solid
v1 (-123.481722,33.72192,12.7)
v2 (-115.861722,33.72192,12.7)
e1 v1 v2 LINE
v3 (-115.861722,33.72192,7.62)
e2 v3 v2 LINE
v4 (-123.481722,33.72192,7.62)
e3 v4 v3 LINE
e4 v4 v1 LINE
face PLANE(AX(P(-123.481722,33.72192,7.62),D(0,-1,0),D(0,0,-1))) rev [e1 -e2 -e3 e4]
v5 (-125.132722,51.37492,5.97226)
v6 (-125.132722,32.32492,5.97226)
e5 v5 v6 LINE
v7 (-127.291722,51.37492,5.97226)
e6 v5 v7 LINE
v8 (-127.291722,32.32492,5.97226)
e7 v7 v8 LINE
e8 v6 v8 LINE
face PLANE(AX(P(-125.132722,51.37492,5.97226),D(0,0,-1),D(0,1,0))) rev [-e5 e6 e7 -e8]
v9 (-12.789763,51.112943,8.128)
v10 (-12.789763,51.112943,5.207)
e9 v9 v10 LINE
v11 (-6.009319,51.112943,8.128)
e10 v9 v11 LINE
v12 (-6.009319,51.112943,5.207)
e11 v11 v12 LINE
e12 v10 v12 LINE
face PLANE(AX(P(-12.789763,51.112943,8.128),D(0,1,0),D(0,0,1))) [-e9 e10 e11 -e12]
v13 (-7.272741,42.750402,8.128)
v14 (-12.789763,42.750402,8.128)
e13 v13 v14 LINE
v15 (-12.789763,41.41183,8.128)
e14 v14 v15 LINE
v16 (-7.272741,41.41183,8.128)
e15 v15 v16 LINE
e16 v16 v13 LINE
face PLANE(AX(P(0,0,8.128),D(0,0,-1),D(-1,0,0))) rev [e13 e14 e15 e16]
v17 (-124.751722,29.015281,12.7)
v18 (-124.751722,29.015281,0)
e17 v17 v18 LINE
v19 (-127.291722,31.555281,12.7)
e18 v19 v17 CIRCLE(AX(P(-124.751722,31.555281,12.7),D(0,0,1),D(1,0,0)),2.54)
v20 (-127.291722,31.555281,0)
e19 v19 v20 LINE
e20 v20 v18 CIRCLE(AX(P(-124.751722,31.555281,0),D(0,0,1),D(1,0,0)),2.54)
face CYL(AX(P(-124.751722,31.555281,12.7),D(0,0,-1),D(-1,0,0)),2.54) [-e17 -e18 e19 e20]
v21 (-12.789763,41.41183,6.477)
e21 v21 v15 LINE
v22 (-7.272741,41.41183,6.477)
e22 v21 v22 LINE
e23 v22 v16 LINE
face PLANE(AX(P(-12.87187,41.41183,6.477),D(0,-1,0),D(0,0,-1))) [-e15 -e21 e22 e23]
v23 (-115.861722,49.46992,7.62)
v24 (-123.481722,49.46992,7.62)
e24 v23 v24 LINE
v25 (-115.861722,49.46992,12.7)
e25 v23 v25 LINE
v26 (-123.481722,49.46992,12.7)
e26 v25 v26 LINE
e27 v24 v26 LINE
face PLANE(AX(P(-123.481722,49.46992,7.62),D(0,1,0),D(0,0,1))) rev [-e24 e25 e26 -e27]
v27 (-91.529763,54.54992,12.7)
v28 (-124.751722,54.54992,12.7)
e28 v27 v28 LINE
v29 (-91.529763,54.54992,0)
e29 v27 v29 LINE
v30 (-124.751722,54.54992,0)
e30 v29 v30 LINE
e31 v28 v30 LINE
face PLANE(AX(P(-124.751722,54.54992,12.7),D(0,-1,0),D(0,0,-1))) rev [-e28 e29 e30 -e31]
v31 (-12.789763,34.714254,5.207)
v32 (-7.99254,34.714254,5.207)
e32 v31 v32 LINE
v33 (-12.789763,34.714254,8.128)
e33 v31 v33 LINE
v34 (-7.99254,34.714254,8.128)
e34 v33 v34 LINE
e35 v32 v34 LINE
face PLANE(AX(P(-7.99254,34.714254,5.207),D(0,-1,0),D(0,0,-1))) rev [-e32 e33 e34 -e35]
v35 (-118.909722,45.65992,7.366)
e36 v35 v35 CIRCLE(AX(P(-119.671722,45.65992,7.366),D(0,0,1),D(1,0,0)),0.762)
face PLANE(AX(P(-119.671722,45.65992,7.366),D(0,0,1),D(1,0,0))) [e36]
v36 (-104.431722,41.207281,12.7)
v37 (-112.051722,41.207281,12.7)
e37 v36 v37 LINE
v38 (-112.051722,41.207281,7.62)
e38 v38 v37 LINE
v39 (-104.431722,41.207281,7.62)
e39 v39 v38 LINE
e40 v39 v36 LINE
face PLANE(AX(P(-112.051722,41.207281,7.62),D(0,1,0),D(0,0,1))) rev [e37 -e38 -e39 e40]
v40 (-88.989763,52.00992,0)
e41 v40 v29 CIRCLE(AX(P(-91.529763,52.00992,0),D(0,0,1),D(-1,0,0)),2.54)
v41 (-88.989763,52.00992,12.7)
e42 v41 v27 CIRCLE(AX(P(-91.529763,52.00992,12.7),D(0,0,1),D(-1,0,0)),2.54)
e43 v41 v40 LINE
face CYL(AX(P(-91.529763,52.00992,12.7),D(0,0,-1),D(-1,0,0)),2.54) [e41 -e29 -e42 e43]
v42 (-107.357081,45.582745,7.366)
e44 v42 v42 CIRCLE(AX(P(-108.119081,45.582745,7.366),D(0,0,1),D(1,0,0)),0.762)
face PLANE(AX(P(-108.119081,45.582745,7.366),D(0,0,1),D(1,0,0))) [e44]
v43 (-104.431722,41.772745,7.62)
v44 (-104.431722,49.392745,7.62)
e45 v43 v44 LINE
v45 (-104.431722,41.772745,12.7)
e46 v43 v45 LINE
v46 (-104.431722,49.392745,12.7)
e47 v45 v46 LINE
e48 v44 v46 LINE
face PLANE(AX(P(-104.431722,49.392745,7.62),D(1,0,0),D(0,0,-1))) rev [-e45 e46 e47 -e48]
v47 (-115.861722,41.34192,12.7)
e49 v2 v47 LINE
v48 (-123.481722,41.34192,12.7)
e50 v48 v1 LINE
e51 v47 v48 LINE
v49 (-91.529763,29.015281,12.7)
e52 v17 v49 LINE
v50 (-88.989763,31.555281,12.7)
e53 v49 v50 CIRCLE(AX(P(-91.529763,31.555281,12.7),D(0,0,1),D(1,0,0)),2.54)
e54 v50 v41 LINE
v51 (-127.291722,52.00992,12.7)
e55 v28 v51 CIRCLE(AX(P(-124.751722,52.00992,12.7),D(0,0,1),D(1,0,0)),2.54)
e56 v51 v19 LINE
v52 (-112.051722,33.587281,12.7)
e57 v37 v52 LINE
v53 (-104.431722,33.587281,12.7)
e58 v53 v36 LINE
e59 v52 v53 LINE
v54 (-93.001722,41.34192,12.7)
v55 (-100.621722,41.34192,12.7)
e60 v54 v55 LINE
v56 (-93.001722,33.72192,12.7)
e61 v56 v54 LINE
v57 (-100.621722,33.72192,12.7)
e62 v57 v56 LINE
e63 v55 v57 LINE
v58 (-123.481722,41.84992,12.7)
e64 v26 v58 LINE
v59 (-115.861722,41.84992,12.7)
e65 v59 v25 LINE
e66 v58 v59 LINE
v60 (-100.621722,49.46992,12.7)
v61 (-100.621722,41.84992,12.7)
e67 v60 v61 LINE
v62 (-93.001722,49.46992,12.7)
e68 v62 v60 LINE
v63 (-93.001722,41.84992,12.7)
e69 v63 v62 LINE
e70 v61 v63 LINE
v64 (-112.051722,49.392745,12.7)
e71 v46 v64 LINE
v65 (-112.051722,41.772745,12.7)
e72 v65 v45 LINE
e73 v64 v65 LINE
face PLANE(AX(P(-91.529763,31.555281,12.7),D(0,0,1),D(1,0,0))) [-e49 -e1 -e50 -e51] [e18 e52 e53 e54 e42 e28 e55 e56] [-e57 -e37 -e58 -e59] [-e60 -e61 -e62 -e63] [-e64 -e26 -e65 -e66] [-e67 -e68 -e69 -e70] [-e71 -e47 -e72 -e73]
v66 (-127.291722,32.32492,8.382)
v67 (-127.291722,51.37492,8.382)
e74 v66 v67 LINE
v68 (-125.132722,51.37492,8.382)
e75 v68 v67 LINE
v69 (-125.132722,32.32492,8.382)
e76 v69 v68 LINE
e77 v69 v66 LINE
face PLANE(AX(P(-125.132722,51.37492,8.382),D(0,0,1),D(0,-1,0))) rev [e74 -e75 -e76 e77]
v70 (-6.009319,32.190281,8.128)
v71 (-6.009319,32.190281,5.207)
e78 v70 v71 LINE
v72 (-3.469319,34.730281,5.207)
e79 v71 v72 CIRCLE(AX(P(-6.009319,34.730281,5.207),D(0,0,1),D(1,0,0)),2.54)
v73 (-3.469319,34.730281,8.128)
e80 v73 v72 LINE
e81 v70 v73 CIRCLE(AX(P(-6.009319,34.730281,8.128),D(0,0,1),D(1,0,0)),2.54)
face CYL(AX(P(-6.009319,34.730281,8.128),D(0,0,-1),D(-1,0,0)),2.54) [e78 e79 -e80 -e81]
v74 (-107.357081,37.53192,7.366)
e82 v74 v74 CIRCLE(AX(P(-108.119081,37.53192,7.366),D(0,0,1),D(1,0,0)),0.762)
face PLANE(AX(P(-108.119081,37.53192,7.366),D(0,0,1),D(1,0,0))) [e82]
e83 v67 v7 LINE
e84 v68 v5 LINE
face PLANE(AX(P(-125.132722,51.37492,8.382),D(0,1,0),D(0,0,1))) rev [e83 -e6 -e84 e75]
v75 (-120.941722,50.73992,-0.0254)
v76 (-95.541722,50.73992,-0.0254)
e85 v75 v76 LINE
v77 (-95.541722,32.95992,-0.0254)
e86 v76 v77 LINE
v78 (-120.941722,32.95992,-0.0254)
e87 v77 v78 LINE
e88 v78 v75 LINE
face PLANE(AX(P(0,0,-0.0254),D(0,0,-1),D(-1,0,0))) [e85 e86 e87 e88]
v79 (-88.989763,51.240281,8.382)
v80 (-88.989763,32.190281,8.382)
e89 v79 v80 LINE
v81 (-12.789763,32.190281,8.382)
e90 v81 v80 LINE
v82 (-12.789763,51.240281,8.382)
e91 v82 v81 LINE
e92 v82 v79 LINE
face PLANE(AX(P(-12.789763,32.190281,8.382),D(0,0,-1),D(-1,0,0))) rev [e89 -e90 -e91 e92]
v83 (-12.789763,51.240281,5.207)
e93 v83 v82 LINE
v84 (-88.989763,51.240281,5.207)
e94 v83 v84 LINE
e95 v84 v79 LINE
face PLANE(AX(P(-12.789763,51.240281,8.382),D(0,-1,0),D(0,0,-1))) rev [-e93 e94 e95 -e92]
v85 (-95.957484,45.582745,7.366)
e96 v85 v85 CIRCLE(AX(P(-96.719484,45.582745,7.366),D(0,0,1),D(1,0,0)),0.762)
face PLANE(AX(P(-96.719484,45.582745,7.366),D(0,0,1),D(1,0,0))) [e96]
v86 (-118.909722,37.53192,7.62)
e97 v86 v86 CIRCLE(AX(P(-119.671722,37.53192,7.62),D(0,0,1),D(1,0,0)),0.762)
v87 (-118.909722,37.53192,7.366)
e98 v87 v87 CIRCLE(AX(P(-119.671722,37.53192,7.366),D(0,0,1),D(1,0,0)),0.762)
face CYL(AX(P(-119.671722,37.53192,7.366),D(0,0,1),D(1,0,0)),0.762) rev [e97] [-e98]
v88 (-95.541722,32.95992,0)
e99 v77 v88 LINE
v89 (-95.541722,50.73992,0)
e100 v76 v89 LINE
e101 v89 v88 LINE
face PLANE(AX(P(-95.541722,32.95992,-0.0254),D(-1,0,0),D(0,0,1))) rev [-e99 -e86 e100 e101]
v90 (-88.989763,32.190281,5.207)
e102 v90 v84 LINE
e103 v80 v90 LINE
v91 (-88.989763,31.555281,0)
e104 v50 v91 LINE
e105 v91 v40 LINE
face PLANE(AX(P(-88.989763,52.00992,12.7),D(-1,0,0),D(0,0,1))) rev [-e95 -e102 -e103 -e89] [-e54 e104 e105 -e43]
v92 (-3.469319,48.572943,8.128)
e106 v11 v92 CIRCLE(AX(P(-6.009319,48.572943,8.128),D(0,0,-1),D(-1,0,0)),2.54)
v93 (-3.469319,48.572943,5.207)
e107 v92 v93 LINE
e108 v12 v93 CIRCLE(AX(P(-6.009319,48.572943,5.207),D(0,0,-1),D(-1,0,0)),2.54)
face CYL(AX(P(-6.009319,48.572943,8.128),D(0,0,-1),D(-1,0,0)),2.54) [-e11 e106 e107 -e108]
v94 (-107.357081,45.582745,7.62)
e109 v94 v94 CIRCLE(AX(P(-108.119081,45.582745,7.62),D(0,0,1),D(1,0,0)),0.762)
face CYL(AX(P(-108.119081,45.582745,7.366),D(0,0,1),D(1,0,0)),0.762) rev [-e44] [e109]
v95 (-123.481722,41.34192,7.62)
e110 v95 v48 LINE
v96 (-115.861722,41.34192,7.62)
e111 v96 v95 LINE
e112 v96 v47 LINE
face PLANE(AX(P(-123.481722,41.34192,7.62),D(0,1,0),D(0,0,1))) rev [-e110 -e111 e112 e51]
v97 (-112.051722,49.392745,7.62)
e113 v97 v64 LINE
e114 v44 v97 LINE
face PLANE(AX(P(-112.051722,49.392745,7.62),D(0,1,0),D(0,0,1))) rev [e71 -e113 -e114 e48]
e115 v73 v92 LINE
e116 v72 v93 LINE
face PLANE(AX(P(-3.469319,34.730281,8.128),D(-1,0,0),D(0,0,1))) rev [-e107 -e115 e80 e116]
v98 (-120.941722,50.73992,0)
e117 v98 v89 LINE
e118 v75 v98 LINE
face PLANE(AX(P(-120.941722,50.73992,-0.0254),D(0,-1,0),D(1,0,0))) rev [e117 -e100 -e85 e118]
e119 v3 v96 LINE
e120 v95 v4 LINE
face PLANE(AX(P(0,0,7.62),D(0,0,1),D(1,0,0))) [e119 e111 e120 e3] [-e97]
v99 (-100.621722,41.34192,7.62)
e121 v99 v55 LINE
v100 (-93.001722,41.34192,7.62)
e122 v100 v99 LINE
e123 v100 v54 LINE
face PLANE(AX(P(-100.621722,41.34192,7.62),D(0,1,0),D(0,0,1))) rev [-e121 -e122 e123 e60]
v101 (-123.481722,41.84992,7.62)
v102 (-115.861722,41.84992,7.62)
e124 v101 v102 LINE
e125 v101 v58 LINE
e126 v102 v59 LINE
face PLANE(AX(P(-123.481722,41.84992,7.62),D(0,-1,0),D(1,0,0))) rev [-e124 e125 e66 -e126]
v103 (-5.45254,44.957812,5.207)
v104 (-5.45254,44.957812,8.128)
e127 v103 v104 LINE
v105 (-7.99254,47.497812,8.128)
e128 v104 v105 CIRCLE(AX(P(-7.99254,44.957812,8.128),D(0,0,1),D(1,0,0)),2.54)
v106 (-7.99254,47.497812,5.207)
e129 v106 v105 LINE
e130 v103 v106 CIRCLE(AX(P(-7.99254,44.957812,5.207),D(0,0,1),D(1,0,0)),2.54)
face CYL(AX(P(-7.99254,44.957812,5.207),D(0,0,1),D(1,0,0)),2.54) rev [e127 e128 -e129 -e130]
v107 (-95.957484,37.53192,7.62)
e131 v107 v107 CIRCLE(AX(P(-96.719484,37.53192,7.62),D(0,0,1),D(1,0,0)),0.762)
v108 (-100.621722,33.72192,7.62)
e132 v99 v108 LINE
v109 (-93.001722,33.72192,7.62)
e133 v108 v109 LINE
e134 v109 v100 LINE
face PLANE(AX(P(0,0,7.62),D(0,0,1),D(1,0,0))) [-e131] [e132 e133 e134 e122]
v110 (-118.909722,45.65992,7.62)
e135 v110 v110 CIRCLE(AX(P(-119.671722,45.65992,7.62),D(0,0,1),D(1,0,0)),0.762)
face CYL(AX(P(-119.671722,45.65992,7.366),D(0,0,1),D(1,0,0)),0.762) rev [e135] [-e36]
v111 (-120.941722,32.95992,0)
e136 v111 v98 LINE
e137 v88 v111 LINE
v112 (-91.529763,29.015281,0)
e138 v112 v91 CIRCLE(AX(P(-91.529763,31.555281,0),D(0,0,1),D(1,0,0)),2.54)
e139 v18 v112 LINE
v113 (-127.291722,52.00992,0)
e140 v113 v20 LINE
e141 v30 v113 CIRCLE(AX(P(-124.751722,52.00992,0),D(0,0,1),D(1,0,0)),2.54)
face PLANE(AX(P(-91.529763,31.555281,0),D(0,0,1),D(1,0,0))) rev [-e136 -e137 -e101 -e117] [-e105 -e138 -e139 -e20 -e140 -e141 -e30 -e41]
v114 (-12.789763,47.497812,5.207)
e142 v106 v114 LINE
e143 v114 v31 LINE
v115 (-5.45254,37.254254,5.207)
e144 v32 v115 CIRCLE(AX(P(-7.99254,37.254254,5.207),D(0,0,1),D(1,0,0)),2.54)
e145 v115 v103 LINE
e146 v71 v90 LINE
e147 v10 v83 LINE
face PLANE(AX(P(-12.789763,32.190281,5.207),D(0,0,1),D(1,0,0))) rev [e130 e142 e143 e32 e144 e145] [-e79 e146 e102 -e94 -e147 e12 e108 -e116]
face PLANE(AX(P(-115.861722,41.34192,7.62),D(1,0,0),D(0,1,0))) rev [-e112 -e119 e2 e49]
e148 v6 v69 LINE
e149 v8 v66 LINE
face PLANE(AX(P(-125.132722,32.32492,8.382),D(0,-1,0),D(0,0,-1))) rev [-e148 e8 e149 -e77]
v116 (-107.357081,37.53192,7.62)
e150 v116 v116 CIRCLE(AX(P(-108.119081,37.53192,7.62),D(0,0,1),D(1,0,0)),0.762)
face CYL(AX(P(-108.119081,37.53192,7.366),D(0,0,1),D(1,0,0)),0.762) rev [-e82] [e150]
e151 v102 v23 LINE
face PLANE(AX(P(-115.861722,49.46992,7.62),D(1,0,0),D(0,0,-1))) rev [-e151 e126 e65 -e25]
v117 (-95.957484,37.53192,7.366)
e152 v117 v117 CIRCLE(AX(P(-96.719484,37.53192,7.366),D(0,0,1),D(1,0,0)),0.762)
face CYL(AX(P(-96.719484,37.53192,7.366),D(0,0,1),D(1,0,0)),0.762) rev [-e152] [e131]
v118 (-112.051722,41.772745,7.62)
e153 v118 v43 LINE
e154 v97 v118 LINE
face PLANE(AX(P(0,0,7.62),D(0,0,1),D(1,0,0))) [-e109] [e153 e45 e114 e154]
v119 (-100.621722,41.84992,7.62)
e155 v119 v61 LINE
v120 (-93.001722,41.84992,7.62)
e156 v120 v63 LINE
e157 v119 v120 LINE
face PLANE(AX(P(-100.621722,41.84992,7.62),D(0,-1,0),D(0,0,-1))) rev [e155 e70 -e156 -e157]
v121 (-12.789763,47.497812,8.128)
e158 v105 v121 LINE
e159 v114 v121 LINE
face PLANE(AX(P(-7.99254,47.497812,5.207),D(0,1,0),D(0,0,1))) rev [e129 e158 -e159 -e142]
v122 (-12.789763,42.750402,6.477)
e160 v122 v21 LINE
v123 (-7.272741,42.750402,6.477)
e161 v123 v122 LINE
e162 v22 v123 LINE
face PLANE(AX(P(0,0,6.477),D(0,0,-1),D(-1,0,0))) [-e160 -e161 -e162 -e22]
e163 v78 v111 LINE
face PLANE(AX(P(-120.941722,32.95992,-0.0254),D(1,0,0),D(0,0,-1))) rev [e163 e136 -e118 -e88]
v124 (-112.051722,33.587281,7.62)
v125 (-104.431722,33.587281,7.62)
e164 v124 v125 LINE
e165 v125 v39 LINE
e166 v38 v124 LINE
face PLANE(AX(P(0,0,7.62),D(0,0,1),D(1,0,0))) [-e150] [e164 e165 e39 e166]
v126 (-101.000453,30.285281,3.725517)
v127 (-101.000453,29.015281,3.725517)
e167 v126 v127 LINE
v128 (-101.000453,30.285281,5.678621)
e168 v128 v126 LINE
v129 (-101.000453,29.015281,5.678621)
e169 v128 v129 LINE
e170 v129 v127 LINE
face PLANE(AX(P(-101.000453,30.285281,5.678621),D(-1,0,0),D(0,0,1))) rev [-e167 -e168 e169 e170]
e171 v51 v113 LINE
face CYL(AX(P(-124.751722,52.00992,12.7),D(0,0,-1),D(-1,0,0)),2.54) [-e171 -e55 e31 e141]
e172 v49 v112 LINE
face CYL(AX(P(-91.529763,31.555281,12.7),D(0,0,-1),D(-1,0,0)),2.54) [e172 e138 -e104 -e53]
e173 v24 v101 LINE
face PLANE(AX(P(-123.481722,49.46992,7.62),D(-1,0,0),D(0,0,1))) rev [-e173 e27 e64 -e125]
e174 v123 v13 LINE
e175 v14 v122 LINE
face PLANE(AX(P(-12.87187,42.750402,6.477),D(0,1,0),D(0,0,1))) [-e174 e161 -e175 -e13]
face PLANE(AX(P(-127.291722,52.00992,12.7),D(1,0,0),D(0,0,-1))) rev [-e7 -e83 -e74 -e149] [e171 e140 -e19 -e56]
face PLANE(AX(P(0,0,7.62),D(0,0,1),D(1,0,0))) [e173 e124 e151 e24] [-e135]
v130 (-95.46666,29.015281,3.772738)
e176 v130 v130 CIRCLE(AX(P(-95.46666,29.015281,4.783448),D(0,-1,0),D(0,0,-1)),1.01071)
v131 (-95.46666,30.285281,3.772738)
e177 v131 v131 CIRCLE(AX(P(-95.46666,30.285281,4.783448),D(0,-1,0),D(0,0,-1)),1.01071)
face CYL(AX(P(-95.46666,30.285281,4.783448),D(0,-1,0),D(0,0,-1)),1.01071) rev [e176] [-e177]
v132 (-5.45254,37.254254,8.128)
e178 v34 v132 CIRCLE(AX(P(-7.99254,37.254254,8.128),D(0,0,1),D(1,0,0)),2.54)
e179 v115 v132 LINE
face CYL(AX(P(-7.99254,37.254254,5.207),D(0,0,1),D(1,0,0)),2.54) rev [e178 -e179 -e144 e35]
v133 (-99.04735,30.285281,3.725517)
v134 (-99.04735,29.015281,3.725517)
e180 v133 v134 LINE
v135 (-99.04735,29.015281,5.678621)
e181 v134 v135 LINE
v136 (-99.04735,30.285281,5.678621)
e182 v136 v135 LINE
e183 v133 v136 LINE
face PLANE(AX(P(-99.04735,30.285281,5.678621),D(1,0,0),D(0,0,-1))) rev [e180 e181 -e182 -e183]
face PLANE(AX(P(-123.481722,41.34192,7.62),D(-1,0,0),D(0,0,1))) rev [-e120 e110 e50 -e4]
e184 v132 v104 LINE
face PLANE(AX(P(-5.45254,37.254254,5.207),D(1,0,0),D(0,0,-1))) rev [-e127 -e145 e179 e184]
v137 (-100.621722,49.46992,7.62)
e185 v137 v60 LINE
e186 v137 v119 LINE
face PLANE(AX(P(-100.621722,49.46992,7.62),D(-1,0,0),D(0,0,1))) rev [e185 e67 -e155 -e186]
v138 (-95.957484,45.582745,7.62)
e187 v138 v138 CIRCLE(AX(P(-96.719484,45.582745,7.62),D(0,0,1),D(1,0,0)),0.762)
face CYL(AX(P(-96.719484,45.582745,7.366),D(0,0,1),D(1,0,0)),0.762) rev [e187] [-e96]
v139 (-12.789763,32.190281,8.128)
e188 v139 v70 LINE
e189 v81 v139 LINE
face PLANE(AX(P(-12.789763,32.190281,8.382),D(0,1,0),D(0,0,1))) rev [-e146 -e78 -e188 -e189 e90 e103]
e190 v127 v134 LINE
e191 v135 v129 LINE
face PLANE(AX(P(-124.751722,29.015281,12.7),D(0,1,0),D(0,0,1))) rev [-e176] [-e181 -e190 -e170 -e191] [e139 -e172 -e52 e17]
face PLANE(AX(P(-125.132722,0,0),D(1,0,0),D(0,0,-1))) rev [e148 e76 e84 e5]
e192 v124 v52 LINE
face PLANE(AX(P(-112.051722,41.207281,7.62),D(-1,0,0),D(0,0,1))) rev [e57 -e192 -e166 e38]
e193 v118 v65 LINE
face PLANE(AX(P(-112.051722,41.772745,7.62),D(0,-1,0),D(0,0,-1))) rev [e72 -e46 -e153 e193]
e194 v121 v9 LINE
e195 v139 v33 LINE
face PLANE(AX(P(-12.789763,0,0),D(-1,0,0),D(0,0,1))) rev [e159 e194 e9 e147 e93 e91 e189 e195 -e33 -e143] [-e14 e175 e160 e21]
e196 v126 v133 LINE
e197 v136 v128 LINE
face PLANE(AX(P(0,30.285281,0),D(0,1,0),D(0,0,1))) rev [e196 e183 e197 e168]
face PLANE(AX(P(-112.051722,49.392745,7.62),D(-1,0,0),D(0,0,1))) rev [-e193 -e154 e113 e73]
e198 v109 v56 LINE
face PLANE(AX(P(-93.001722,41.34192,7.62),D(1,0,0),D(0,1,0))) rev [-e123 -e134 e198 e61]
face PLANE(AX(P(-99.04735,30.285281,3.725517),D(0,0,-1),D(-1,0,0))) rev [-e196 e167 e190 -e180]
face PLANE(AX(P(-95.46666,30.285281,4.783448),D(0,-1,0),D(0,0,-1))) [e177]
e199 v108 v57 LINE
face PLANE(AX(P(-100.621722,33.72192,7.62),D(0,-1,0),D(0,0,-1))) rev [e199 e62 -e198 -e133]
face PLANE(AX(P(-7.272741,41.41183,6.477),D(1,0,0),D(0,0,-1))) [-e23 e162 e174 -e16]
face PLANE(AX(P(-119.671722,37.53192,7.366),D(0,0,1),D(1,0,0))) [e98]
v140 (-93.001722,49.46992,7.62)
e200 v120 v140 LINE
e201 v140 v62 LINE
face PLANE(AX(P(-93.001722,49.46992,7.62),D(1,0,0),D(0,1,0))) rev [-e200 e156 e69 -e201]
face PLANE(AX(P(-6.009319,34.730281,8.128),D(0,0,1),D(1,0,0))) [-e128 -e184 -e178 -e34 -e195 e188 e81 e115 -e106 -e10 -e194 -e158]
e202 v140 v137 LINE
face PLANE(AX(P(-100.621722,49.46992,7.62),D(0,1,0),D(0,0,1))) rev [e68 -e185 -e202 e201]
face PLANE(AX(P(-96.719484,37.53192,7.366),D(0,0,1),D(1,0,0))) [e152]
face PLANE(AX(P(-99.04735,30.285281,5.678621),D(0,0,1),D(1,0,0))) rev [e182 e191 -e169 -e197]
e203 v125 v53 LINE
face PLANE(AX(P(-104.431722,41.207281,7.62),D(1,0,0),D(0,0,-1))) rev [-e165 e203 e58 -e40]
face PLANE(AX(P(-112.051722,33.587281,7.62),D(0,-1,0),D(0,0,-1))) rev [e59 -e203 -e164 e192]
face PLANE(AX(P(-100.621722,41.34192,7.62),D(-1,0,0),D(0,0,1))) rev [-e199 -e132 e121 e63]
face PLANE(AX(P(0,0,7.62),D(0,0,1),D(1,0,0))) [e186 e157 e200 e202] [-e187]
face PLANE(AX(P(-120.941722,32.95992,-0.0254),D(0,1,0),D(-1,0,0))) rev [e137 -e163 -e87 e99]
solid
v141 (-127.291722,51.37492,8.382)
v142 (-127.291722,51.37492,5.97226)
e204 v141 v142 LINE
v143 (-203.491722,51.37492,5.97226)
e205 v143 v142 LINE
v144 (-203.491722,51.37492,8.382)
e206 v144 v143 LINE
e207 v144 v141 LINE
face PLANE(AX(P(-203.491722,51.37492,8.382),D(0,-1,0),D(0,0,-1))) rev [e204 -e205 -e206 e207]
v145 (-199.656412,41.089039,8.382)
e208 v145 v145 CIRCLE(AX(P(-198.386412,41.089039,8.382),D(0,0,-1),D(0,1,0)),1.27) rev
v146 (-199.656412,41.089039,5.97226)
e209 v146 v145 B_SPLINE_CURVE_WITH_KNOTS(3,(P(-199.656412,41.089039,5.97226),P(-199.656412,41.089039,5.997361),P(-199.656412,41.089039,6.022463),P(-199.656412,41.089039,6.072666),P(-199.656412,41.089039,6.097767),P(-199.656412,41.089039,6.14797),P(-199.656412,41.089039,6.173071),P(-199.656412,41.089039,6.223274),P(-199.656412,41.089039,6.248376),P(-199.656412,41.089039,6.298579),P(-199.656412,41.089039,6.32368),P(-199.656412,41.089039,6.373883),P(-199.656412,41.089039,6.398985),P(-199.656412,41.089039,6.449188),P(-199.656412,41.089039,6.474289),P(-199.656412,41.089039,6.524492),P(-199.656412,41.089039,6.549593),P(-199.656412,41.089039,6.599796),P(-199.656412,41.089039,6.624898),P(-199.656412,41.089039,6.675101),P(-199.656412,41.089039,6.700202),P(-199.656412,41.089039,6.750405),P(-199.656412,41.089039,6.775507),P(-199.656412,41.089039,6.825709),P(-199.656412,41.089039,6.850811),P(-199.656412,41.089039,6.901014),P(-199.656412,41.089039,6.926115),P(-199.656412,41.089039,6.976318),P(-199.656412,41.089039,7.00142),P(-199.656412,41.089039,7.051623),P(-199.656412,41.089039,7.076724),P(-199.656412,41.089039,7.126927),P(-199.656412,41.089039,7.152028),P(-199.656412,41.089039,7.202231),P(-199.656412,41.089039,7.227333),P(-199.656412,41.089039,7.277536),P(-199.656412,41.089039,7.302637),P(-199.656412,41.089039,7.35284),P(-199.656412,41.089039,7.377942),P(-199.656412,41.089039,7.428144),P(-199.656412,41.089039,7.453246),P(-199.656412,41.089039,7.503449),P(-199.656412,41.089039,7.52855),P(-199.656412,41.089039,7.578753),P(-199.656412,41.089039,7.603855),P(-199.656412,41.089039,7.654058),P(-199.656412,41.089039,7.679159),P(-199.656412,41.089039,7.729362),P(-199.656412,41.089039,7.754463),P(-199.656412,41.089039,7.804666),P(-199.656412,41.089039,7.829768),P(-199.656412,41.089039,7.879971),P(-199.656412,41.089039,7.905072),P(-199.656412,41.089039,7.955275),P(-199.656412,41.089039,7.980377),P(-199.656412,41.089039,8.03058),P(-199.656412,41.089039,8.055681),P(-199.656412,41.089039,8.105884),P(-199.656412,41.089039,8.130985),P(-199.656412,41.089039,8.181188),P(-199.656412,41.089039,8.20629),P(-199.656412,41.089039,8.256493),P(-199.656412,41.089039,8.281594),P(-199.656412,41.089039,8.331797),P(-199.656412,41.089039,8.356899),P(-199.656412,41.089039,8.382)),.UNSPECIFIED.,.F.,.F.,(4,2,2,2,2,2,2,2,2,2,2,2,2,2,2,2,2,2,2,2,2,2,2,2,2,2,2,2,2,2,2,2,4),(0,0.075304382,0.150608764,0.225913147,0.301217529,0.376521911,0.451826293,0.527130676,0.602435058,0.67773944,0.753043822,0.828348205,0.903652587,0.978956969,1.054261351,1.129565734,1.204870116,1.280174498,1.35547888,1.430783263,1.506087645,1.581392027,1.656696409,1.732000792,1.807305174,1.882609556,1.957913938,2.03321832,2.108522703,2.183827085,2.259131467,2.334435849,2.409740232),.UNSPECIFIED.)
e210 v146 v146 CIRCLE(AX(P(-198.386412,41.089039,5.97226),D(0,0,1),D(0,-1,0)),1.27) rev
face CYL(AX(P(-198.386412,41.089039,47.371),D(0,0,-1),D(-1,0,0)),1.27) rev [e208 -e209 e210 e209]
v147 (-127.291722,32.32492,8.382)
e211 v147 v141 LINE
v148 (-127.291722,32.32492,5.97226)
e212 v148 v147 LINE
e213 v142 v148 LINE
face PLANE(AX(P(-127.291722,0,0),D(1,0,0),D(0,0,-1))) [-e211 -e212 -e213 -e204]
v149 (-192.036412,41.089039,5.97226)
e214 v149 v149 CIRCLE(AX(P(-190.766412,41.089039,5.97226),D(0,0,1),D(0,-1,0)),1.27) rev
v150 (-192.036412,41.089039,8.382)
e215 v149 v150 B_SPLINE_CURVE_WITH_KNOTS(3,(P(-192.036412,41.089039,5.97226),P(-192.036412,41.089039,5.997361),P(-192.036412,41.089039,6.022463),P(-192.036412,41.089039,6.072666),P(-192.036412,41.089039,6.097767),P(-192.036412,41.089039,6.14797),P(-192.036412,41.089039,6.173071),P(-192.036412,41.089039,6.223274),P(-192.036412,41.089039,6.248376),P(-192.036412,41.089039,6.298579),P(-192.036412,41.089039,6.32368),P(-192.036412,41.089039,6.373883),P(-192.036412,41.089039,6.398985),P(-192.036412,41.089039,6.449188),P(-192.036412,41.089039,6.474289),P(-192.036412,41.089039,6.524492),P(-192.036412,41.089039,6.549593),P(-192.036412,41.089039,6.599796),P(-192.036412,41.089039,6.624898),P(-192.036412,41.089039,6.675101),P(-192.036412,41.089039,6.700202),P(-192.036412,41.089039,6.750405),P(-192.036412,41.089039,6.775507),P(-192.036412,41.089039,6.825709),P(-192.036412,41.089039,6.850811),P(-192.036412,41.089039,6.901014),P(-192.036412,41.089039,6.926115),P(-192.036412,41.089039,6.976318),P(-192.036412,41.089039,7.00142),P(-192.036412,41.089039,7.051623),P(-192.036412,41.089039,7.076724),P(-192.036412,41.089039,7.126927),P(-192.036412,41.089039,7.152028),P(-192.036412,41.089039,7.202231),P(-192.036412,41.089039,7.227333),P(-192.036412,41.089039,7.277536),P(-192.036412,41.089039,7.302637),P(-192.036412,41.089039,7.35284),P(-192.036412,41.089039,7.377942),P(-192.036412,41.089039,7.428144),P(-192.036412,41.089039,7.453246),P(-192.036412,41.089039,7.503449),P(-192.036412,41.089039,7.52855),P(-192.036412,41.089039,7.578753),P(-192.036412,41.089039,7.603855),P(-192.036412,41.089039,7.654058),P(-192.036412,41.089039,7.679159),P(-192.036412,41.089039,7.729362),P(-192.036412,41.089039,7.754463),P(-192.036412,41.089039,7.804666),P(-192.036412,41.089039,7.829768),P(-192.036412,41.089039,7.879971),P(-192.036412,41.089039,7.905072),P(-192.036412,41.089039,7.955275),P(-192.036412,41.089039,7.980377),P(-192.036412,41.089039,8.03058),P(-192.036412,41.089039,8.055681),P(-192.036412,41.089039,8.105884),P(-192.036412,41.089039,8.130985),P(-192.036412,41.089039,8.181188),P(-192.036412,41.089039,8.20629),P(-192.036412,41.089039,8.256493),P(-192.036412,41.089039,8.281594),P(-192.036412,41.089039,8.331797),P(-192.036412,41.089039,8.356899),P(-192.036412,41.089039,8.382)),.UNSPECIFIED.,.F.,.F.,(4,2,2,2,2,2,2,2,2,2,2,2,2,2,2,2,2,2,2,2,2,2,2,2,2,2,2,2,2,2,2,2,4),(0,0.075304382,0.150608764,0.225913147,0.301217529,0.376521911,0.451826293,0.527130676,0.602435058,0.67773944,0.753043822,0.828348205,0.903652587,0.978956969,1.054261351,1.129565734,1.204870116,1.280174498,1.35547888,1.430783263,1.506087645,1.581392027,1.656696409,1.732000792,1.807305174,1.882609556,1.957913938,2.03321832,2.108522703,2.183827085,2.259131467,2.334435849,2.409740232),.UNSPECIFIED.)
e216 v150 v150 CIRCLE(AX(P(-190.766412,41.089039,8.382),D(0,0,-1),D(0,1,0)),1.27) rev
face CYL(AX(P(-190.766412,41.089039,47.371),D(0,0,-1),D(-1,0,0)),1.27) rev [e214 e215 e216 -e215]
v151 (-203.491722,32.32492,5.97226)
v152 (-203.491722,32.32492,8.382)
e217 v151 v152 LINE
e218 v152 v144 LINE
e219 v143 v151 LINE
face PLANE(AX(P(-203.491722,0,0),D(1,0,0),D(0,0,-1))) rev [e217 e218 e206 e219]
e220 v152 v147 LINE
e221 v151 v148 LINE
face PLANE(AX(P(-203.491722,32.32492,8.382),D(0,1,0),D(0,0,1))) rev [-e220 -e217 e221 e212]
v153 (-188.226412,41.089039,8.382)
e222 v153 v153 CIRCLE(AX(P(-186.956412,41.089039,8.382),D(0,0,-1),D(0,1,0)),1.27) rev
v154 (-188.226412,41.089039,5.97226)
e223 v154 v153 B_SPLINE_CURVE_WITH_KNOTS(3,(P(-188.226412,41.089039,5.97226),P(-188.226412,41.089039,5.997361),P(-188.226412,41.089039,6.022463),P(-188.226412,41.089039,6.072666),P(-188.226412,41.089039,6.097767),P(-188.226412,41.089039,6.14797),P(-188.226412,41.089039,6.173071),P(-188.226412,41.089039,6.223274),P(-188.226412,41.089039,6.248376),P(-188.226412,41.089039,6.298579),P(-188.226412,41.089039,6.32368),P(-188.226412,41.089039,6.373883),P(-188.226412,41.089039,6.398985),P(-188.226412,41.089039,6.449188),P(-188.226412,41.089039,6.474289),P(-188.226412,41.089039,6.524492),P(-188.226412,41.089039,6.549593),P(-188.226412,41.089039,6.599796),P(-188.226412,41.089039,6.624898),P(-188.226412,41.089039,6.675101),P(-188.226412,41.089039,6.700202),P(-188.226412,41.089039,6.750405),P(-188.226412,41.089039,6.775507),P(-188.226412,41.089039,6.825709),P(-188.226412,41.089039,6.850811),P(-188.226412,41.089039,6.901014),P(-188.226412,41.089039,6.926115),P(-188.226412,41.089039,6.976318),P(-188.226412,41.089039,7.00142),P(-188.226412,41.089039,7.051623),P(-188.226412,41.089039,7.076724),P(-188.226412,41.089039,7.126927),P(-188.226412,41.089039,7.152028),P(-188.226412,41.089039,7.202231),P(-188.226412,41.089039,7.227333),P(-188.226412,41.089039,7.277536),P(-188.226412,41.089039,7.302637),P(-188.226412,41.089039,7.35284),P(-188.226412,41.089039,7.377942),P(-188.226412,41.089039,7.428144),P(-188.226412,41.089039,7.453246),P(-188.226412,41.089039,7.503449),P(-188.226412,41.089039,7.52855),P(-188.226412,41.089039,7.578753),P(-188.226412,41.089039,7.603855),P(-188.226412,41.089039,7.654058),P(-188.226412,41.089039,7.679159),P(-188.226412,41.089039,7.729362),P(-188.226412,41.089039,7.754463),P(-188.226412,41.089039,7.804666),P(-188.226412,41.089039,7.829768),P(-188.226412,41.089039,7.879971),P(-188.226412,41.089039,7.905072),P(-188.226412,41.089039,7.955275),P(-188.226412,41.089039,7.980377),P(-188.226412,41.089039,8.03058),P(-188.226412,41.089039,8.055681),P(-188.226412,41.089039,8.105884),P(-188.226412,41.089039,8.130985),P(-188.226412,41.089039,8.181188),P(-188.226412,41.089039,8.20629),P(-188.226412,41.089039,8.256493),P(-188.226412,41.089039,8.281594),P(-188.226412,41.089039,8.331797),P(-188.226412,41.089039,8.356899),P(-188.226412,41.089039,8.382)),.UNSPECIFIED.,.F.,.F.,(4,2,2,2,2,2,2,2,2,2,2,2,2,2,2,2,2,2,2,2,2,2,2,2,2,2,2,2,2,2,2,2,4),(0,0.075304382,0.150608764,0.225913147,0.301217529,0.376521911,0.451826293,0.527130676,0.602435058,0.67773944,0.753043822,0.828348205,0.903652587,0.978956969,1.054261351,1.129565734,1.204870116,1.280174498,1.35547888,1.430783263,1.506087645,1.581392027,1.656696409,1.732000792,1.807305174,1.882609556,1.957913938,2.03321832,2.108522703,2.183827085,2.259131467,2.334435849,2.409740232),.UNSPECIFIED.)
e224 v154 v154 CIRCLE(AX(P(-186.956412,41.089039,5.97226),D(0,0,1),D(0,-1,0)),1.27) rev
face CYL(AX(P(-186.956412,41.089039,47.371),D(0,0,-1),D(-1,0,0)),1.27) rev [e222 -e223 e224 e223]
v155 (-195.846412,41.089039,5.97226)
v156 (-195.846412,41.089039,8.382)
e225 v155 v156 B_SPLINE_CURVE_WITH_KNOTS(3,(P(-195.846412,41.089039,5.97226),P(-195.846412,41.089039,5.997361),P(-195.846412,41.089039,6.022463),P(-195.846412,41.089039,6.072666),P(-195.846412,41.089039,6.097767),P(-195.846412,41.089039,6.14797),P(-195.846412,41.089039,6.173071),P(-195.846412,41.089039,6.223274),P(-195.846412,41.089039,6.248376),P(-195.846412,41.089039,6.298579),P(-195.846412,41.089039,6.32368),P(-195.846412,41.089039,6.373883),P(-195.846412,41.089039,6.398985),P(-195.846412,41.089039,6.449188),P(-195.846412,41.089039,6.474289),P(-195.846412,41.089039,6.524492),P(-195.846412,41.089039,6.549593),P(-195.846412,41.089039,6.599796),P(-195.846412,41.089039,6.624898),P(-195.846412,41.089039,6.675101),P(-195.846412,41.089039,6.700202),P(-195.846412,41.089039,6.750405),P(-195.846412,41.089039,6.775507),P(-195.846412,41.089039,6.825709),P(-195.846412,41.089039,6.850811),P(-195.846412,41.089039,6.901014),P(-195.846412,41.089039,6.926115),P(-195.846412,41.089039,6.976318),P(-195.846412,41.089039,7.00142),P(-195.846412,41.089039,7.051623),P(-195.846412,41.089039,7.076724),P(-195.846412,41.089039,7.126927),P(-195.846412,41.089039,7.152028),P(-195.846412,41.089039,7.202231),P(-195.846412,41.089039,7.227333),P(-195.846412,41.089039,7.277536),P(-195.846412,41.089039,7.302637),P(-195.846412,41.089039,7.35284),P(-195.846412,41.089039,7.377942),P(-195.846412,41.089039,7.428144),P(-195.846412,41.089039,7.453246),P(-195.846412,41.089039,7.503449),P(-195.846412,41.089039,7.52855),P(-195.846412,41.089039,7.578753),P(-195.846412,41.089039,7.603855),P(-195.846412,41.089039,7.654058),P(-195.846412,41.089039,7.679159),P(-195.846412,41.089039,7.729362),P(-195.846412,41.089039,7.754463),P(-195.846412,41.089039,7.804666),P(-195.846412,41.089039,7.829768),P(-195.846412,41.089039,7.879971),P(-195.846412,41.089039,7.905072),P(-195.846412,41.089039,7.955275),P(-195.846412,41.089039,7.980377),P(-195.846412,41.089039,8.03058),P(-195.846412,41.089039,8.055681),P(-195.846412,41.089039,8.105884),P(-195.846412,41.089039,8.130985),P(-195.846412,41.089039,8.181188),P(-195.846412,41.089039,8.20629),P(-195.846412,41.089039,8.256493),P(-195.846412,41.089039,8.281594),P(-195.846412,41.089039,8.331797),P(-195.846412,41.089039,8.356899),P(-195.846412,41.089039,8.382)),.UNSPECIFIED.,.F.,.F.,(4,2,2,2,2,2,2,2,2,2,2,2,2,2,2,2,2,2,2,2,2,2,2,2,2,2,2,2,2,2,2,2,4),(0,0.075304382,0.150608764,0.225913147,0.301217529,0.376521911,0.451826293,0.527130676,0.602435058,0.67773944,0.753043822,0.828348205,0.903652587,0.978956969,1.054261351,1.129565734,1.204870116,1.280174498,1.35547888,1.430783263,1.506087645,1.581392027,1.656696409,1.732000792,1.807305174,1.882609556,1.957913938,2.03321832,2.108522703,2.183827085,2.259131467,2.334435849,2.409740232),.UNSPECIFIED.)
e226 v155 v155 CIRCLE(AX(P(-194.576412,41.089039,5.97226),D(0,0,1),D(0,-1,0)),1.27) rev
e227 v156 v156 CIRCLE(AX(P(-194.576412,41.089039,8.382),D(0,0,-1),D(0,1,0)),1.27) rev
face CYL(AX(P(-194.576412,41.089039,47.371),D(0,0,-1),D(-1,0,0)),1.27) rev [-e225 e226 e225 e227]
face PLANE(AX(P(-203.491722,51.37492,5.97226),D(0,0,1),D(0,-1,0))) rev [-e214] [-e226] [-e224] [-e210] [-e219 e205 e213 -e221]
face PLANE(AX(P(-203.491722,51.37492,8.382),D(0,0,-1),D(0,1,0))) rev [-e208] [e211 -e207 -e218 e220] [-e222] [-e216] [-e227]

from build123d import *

# Parameters (mm, degrees)
BOSS_EXTRUDE2_DEPTH     = 12.7
SKETCH4_W               = 7.62
SKETCH4_H               = 7.62
CUT_EXTRUDE1_DEPTH      = 5.08
SKETCH5_R               = 1.010710011
SKETCH5_W               = 1.95310334
SKETCH5_H               = 1.953103341
CUT_EXTRUDE2_DEPTH      = 1.27
CUT_EXTRUDE6_DEPTH      = 0.508
CUT_EXTRUDE6_DEPTH_BACK = 0.254
SKETCH6_R               = 0.762
BOSS_EXTRUDE3_START     = -2.159
BOSS_EXTRUDE3_OUTLINE_W = 2.409740232
BOSS_EXTRUDE3_OUTLINE_H = 19.05
BOSS_EXTRUDE3_DEPTH     = 2.159
SKETCH8_W               = 3.175
SKETCH8_H               = 19.05
BOSS_EXTRUDE4_DEPTH     = 76.2
SKETCH9_W               = 25.4
SKETCH9_H               = 17.78
BOSS_EXTRUDE5_DEPTH     = 0.0254
SKETCH7_2_W             = 2.409740232
SKETCH7_2_H             = 19.05
BOSS_EXTRUDE6_DEPTH     = 76.2
CUT_EXTRUDE7_DEPTH      = 38.989
CUT_EXTRUDE7_DEPTH_BACK = 41.529
SKETCH15_R              = 1.27
BOSS_EXTRUDE8_DEPTH     = 2.921
CUT_EXTRUDE8_DEPTH      = 2.921
SKETCH22_W              = 5.599128384
SKETCH22_H              = 1.338572143
BOSS_EXTRUDE9_DEPTH     = 1.651


# Read off the part's stored shape, not the designer's step: Boss-Extrude3
with BuildPart() as part:
    # Sketch3 → Boss-Extrude2 (new body)
    with BuildSketch(Plane.XY):
        with BuildLine():
            Line((-124.751722325, 54.549920467), (-91.529763067, 54.549920467))
            ThreePointArc((-91.529763067, 54.549920467), (-89.733711843, 53.805971692), (-88.989763067, 52.009920467))
            Line((-88.989763067, 52.009920467), (-88.989763067, 31.555280962))
            ThreePointArc((-88.989763067, 31.555280962), (-89.733711843, 29.759229738), (-91.529763067, 29.015280962))
            Line((-91.529763067, 29.015280962), (-124.751722325, 29.015280962))
            ThreePointArc((-124.751722325, 29.015280962), (-126.547773549, 29.759229738), (-127.291722325, 31.555280962))
            Line((-127.291722325, 31.555280962), (-127.291722325, 52.009920467))
            ThreePointArc((-127.291722325, 52.009920467), (-126.547773549, 53.805971692), (-124.751722325, 54.549920467))
        make_face()
    extrude(amount=BOSS_EXTRUDE2_DEPTH)

    # Sketch4 → Cut-Extrude1 (cut)
    with BuildSketch(Plane.XY.offset(12.7)):
        with Locations((-119.671722325, 45.659920467)):
            Rectangle(SKETCH4_W, SKETCH4_H)
        with Locations((-96.811722325, 45.659920467)):
            Rectangle(SKETCH4_W, SKETCH4_H)
        Polygon((-13.53517885, 41.715280962), (0, 47.630459812), (0, 34.095280962), (-13.53517885, 34.095280962), align=None)
        with Locations((-108.241722325, 45.582744839)):
            Rectangle(SKETCH4_W, SKETCH4_H)
        with Locations((-96.811722325, 37.531920467)):
            Rectangle(SKETCH4_W, SKETCH4_H)
        with Locations((-119.671722325, 37.531920467)):
            Rectangle(SKETCH4_W, SKETCH4_H)
        with Locations((-108.241722325, 37.397280962)):
            Rectangle(SKETCH4_W, SKETCH4_H)
    extrude(amount=-CUT_EXTRUDE1_DEPTH, mode=Mode.SUBTRACT)

    # Sketch5 → Cut-Extrude2 (cut)
    with BuildSketch(Plane(origin=(0, 29.015280962, 0), x_dir=(-1, 0, 0), z_dir=(0, -1, 0))):
        with Locations(Location((95.466660312, -4.783448362, 0), (0, 0, 90))):
            Circle(SKETCH5_R)
        with Locations((100.02390144, -4.702069057)):
            Rectangle(SKETCH5_W, SKETCH5_H)
    extrude(amount=-CUT_EXTRUDE2_DEPTH, mode=Mode.SUBTRACT)

    # Sketch6 → Cut-Extrude6 (cut, two sides: drawn at the far end of the back side and taken through both)
    with BuildSketch(Plane.XY.offset(7.62).offset(-CUT_EXTRUDE6_DEPTH_BACK)):
        with Locations((-119.671722325, 45.659920467)):
            Circle(SKETCH6_R)
        with Locations((-108.119080998, 45.582744839)):
            Circle(SKETCH6_R)
        with Locations((-96.719484025, 37.531920467)):
            Circle(SKETCH6_R)
        with Locations((-96.719484025, 45.582744839)):
            Circle(SKETCH6_R)
        with Locations((-119.671722325, 37.531920467)):
            Circle(SKETCH6_R)
        with Locations((-108.119080998, 37.531920467)):
            Circle(SKETCH6_R)
    extrude(amount=CUT_EXTRUDE6_DEPTH + CUT_EXTRUDE6_DEPTH_BACK, mode=Mode.SUBTRACT)

    # Boss-Extrude3 outline → Boss-Extrude3 (cut)
    with BuildSketch(Plane.ZY.offset(127.291722325).offset(BOSS_EXTRUDE3_START)):
        with Locations((7.177129884, 41.849920467)):
            Rectangle(BOSS_EXTRUDE3_OUTLINE_W, BOSS_EXTRUDE3_OUTLINE_H)
    extrude(amount=BOSS_EXTRUDE3_DEPTH, mode=Mode.SUBTRACT)

    # Sketch8 → Boss-Extrude4 (add)
    with BuildSketch(Plane(origin=(-88.989763067, 0, 0), x_dir=(0, 0, -1), z_dir=(1, 0, 0))):
        with Locations((-6.7945, 41.715280962)):
            Rectangle(SKETCH8_W, SKETCH8_H)
    extrude(amount=BOSS_EXTRUDE4_DEPTH)

    # Sketch9 → Boss-Extrude5 (add)
    with BuildSketch(Plane(origin=(0, 0, 0), x_dir=(-1, 0, 0), z_dir=(0, 0, -1))):
        with Locations((108.241722325, 41.849920467)):
            Rectangle(SKETCH9_W, SKETCH9_H)
    extrude(amount=BOSS_EXTRUDE5_DEPTH)

    # Sketch18 → Boss-Extrude8 (add)
    with BuildSketch(Plane(origin=(0, 0, 5.207), x_dir=(-1, 0, 0), z_dir=(0, 0, -1))):
        with BuildLine():
            Line((12.789763067, 32.190280962), (6.009318879, 32.190280962))
            ThreePointArc((6.009318879, 32.190280962), (4.213267655, 32.934229738), (3.469318879, 34.730280962))
            Line((3.469318879, 34.730280962), (3.469318879, 48.572942797))
            ThreePointArc((3.469318879, 48.572942797), (4.213267655, 50.368994021), (6.009318879, 51.112942797))
            Line((6.009318879, 51.112942797), (12.789763067, 51.112942797))
            Line((12.789763067, 51.112942797), (12.789763067, 32.190280962))
        make_face()
    extrude(amount=-BOSS_EXTRUDE8_DEPTH)

    # Sketch19 → Cut-Extrude8 (cut)
    with BuildSketch(Plane.XY.offset(8.128)):
        with BuildLine():
            Line((-7.992540277, 34.714254039), (-12.789763067, 34.714254039))
            Line((-12.789763067, 34.714254039), (-12.789763067, 47.497812307))
            Line((-12.789763067, 47.497812307), (-7.992540277, 47.497812307))
            ThreePointArc((-7.992540277, 47.497812307), (-6.196489053, 46.753863531), (-5.452540277, 44.957812307))
            Line((-5.452540277, 44.957812307), (-5.452540277, 37.254254039))
            ThreePointArc((-5.452540277, 37.254254039), (-6.196489053, 35.458202815), (-7.992540277, 34.714254039))
        make_face()
    extrude(amount=-CUT_EXTRUDE8_DEPTH, mode=Mode.SUBTRACT)

    # Sketch22 → Boss-Extrude9 (add)
    with BuildSketch(Plane.XY.offset(8.128)):
        with Locations((-10.072305381, 42.081115795)):
            Rectangle(SKETCH22_W, SKETCH22_H)
    extrude(amount=-BOSS_EXTRUDE9_DEPTH)


with BuildPart() as body_2:
    # Sketch7<2> → Boss-Extrude6 (new body)
    with BuildSketch(Plane.ZY.offset(127.291722325)):
        with Locations((7.177129884, 41.849920467)):
            Rectangle(SKETCH7_2_W, SKETCH7_2_H)
    extrude(amount=BOSS_EXTRUDE6_DEPTH)

    # Sketch15 → Cut-Extrude7 (cut, two sides: drawn at the far end of the back side and taken through both)
    with BuildSketch(Plane.XY.offset(8.382).offset(-CUT_EXTRUDE7_DEPTH_BACK)):
        with Locations(Location((-198.386411658, 41.089038752, 0), (0, 0, 180))):
            Circle(SKETCH15_R)
        with Locations(Location((-194.576411658, 41.089038752, 0), (0, 0, 180))):
            Circle(SKETCH15_R)
        with Locations(Location((-190.766411658, 41.089038752, 0), (0, 0, 180))):
            Circle(SKETCH15_R)
        with Locations(Location((-186.956411658, 41.089038752, 0), (0, 0, 180))):
            Circle(SKETCH15_R)
    extrude(amount=CUT_EXTRUDE7_DEPTH + CUT_EXTRUDE7_DEPTH_BACK, mode=Mode.SUBTRACT)


solid = Compound([part.part, body_2.part])
